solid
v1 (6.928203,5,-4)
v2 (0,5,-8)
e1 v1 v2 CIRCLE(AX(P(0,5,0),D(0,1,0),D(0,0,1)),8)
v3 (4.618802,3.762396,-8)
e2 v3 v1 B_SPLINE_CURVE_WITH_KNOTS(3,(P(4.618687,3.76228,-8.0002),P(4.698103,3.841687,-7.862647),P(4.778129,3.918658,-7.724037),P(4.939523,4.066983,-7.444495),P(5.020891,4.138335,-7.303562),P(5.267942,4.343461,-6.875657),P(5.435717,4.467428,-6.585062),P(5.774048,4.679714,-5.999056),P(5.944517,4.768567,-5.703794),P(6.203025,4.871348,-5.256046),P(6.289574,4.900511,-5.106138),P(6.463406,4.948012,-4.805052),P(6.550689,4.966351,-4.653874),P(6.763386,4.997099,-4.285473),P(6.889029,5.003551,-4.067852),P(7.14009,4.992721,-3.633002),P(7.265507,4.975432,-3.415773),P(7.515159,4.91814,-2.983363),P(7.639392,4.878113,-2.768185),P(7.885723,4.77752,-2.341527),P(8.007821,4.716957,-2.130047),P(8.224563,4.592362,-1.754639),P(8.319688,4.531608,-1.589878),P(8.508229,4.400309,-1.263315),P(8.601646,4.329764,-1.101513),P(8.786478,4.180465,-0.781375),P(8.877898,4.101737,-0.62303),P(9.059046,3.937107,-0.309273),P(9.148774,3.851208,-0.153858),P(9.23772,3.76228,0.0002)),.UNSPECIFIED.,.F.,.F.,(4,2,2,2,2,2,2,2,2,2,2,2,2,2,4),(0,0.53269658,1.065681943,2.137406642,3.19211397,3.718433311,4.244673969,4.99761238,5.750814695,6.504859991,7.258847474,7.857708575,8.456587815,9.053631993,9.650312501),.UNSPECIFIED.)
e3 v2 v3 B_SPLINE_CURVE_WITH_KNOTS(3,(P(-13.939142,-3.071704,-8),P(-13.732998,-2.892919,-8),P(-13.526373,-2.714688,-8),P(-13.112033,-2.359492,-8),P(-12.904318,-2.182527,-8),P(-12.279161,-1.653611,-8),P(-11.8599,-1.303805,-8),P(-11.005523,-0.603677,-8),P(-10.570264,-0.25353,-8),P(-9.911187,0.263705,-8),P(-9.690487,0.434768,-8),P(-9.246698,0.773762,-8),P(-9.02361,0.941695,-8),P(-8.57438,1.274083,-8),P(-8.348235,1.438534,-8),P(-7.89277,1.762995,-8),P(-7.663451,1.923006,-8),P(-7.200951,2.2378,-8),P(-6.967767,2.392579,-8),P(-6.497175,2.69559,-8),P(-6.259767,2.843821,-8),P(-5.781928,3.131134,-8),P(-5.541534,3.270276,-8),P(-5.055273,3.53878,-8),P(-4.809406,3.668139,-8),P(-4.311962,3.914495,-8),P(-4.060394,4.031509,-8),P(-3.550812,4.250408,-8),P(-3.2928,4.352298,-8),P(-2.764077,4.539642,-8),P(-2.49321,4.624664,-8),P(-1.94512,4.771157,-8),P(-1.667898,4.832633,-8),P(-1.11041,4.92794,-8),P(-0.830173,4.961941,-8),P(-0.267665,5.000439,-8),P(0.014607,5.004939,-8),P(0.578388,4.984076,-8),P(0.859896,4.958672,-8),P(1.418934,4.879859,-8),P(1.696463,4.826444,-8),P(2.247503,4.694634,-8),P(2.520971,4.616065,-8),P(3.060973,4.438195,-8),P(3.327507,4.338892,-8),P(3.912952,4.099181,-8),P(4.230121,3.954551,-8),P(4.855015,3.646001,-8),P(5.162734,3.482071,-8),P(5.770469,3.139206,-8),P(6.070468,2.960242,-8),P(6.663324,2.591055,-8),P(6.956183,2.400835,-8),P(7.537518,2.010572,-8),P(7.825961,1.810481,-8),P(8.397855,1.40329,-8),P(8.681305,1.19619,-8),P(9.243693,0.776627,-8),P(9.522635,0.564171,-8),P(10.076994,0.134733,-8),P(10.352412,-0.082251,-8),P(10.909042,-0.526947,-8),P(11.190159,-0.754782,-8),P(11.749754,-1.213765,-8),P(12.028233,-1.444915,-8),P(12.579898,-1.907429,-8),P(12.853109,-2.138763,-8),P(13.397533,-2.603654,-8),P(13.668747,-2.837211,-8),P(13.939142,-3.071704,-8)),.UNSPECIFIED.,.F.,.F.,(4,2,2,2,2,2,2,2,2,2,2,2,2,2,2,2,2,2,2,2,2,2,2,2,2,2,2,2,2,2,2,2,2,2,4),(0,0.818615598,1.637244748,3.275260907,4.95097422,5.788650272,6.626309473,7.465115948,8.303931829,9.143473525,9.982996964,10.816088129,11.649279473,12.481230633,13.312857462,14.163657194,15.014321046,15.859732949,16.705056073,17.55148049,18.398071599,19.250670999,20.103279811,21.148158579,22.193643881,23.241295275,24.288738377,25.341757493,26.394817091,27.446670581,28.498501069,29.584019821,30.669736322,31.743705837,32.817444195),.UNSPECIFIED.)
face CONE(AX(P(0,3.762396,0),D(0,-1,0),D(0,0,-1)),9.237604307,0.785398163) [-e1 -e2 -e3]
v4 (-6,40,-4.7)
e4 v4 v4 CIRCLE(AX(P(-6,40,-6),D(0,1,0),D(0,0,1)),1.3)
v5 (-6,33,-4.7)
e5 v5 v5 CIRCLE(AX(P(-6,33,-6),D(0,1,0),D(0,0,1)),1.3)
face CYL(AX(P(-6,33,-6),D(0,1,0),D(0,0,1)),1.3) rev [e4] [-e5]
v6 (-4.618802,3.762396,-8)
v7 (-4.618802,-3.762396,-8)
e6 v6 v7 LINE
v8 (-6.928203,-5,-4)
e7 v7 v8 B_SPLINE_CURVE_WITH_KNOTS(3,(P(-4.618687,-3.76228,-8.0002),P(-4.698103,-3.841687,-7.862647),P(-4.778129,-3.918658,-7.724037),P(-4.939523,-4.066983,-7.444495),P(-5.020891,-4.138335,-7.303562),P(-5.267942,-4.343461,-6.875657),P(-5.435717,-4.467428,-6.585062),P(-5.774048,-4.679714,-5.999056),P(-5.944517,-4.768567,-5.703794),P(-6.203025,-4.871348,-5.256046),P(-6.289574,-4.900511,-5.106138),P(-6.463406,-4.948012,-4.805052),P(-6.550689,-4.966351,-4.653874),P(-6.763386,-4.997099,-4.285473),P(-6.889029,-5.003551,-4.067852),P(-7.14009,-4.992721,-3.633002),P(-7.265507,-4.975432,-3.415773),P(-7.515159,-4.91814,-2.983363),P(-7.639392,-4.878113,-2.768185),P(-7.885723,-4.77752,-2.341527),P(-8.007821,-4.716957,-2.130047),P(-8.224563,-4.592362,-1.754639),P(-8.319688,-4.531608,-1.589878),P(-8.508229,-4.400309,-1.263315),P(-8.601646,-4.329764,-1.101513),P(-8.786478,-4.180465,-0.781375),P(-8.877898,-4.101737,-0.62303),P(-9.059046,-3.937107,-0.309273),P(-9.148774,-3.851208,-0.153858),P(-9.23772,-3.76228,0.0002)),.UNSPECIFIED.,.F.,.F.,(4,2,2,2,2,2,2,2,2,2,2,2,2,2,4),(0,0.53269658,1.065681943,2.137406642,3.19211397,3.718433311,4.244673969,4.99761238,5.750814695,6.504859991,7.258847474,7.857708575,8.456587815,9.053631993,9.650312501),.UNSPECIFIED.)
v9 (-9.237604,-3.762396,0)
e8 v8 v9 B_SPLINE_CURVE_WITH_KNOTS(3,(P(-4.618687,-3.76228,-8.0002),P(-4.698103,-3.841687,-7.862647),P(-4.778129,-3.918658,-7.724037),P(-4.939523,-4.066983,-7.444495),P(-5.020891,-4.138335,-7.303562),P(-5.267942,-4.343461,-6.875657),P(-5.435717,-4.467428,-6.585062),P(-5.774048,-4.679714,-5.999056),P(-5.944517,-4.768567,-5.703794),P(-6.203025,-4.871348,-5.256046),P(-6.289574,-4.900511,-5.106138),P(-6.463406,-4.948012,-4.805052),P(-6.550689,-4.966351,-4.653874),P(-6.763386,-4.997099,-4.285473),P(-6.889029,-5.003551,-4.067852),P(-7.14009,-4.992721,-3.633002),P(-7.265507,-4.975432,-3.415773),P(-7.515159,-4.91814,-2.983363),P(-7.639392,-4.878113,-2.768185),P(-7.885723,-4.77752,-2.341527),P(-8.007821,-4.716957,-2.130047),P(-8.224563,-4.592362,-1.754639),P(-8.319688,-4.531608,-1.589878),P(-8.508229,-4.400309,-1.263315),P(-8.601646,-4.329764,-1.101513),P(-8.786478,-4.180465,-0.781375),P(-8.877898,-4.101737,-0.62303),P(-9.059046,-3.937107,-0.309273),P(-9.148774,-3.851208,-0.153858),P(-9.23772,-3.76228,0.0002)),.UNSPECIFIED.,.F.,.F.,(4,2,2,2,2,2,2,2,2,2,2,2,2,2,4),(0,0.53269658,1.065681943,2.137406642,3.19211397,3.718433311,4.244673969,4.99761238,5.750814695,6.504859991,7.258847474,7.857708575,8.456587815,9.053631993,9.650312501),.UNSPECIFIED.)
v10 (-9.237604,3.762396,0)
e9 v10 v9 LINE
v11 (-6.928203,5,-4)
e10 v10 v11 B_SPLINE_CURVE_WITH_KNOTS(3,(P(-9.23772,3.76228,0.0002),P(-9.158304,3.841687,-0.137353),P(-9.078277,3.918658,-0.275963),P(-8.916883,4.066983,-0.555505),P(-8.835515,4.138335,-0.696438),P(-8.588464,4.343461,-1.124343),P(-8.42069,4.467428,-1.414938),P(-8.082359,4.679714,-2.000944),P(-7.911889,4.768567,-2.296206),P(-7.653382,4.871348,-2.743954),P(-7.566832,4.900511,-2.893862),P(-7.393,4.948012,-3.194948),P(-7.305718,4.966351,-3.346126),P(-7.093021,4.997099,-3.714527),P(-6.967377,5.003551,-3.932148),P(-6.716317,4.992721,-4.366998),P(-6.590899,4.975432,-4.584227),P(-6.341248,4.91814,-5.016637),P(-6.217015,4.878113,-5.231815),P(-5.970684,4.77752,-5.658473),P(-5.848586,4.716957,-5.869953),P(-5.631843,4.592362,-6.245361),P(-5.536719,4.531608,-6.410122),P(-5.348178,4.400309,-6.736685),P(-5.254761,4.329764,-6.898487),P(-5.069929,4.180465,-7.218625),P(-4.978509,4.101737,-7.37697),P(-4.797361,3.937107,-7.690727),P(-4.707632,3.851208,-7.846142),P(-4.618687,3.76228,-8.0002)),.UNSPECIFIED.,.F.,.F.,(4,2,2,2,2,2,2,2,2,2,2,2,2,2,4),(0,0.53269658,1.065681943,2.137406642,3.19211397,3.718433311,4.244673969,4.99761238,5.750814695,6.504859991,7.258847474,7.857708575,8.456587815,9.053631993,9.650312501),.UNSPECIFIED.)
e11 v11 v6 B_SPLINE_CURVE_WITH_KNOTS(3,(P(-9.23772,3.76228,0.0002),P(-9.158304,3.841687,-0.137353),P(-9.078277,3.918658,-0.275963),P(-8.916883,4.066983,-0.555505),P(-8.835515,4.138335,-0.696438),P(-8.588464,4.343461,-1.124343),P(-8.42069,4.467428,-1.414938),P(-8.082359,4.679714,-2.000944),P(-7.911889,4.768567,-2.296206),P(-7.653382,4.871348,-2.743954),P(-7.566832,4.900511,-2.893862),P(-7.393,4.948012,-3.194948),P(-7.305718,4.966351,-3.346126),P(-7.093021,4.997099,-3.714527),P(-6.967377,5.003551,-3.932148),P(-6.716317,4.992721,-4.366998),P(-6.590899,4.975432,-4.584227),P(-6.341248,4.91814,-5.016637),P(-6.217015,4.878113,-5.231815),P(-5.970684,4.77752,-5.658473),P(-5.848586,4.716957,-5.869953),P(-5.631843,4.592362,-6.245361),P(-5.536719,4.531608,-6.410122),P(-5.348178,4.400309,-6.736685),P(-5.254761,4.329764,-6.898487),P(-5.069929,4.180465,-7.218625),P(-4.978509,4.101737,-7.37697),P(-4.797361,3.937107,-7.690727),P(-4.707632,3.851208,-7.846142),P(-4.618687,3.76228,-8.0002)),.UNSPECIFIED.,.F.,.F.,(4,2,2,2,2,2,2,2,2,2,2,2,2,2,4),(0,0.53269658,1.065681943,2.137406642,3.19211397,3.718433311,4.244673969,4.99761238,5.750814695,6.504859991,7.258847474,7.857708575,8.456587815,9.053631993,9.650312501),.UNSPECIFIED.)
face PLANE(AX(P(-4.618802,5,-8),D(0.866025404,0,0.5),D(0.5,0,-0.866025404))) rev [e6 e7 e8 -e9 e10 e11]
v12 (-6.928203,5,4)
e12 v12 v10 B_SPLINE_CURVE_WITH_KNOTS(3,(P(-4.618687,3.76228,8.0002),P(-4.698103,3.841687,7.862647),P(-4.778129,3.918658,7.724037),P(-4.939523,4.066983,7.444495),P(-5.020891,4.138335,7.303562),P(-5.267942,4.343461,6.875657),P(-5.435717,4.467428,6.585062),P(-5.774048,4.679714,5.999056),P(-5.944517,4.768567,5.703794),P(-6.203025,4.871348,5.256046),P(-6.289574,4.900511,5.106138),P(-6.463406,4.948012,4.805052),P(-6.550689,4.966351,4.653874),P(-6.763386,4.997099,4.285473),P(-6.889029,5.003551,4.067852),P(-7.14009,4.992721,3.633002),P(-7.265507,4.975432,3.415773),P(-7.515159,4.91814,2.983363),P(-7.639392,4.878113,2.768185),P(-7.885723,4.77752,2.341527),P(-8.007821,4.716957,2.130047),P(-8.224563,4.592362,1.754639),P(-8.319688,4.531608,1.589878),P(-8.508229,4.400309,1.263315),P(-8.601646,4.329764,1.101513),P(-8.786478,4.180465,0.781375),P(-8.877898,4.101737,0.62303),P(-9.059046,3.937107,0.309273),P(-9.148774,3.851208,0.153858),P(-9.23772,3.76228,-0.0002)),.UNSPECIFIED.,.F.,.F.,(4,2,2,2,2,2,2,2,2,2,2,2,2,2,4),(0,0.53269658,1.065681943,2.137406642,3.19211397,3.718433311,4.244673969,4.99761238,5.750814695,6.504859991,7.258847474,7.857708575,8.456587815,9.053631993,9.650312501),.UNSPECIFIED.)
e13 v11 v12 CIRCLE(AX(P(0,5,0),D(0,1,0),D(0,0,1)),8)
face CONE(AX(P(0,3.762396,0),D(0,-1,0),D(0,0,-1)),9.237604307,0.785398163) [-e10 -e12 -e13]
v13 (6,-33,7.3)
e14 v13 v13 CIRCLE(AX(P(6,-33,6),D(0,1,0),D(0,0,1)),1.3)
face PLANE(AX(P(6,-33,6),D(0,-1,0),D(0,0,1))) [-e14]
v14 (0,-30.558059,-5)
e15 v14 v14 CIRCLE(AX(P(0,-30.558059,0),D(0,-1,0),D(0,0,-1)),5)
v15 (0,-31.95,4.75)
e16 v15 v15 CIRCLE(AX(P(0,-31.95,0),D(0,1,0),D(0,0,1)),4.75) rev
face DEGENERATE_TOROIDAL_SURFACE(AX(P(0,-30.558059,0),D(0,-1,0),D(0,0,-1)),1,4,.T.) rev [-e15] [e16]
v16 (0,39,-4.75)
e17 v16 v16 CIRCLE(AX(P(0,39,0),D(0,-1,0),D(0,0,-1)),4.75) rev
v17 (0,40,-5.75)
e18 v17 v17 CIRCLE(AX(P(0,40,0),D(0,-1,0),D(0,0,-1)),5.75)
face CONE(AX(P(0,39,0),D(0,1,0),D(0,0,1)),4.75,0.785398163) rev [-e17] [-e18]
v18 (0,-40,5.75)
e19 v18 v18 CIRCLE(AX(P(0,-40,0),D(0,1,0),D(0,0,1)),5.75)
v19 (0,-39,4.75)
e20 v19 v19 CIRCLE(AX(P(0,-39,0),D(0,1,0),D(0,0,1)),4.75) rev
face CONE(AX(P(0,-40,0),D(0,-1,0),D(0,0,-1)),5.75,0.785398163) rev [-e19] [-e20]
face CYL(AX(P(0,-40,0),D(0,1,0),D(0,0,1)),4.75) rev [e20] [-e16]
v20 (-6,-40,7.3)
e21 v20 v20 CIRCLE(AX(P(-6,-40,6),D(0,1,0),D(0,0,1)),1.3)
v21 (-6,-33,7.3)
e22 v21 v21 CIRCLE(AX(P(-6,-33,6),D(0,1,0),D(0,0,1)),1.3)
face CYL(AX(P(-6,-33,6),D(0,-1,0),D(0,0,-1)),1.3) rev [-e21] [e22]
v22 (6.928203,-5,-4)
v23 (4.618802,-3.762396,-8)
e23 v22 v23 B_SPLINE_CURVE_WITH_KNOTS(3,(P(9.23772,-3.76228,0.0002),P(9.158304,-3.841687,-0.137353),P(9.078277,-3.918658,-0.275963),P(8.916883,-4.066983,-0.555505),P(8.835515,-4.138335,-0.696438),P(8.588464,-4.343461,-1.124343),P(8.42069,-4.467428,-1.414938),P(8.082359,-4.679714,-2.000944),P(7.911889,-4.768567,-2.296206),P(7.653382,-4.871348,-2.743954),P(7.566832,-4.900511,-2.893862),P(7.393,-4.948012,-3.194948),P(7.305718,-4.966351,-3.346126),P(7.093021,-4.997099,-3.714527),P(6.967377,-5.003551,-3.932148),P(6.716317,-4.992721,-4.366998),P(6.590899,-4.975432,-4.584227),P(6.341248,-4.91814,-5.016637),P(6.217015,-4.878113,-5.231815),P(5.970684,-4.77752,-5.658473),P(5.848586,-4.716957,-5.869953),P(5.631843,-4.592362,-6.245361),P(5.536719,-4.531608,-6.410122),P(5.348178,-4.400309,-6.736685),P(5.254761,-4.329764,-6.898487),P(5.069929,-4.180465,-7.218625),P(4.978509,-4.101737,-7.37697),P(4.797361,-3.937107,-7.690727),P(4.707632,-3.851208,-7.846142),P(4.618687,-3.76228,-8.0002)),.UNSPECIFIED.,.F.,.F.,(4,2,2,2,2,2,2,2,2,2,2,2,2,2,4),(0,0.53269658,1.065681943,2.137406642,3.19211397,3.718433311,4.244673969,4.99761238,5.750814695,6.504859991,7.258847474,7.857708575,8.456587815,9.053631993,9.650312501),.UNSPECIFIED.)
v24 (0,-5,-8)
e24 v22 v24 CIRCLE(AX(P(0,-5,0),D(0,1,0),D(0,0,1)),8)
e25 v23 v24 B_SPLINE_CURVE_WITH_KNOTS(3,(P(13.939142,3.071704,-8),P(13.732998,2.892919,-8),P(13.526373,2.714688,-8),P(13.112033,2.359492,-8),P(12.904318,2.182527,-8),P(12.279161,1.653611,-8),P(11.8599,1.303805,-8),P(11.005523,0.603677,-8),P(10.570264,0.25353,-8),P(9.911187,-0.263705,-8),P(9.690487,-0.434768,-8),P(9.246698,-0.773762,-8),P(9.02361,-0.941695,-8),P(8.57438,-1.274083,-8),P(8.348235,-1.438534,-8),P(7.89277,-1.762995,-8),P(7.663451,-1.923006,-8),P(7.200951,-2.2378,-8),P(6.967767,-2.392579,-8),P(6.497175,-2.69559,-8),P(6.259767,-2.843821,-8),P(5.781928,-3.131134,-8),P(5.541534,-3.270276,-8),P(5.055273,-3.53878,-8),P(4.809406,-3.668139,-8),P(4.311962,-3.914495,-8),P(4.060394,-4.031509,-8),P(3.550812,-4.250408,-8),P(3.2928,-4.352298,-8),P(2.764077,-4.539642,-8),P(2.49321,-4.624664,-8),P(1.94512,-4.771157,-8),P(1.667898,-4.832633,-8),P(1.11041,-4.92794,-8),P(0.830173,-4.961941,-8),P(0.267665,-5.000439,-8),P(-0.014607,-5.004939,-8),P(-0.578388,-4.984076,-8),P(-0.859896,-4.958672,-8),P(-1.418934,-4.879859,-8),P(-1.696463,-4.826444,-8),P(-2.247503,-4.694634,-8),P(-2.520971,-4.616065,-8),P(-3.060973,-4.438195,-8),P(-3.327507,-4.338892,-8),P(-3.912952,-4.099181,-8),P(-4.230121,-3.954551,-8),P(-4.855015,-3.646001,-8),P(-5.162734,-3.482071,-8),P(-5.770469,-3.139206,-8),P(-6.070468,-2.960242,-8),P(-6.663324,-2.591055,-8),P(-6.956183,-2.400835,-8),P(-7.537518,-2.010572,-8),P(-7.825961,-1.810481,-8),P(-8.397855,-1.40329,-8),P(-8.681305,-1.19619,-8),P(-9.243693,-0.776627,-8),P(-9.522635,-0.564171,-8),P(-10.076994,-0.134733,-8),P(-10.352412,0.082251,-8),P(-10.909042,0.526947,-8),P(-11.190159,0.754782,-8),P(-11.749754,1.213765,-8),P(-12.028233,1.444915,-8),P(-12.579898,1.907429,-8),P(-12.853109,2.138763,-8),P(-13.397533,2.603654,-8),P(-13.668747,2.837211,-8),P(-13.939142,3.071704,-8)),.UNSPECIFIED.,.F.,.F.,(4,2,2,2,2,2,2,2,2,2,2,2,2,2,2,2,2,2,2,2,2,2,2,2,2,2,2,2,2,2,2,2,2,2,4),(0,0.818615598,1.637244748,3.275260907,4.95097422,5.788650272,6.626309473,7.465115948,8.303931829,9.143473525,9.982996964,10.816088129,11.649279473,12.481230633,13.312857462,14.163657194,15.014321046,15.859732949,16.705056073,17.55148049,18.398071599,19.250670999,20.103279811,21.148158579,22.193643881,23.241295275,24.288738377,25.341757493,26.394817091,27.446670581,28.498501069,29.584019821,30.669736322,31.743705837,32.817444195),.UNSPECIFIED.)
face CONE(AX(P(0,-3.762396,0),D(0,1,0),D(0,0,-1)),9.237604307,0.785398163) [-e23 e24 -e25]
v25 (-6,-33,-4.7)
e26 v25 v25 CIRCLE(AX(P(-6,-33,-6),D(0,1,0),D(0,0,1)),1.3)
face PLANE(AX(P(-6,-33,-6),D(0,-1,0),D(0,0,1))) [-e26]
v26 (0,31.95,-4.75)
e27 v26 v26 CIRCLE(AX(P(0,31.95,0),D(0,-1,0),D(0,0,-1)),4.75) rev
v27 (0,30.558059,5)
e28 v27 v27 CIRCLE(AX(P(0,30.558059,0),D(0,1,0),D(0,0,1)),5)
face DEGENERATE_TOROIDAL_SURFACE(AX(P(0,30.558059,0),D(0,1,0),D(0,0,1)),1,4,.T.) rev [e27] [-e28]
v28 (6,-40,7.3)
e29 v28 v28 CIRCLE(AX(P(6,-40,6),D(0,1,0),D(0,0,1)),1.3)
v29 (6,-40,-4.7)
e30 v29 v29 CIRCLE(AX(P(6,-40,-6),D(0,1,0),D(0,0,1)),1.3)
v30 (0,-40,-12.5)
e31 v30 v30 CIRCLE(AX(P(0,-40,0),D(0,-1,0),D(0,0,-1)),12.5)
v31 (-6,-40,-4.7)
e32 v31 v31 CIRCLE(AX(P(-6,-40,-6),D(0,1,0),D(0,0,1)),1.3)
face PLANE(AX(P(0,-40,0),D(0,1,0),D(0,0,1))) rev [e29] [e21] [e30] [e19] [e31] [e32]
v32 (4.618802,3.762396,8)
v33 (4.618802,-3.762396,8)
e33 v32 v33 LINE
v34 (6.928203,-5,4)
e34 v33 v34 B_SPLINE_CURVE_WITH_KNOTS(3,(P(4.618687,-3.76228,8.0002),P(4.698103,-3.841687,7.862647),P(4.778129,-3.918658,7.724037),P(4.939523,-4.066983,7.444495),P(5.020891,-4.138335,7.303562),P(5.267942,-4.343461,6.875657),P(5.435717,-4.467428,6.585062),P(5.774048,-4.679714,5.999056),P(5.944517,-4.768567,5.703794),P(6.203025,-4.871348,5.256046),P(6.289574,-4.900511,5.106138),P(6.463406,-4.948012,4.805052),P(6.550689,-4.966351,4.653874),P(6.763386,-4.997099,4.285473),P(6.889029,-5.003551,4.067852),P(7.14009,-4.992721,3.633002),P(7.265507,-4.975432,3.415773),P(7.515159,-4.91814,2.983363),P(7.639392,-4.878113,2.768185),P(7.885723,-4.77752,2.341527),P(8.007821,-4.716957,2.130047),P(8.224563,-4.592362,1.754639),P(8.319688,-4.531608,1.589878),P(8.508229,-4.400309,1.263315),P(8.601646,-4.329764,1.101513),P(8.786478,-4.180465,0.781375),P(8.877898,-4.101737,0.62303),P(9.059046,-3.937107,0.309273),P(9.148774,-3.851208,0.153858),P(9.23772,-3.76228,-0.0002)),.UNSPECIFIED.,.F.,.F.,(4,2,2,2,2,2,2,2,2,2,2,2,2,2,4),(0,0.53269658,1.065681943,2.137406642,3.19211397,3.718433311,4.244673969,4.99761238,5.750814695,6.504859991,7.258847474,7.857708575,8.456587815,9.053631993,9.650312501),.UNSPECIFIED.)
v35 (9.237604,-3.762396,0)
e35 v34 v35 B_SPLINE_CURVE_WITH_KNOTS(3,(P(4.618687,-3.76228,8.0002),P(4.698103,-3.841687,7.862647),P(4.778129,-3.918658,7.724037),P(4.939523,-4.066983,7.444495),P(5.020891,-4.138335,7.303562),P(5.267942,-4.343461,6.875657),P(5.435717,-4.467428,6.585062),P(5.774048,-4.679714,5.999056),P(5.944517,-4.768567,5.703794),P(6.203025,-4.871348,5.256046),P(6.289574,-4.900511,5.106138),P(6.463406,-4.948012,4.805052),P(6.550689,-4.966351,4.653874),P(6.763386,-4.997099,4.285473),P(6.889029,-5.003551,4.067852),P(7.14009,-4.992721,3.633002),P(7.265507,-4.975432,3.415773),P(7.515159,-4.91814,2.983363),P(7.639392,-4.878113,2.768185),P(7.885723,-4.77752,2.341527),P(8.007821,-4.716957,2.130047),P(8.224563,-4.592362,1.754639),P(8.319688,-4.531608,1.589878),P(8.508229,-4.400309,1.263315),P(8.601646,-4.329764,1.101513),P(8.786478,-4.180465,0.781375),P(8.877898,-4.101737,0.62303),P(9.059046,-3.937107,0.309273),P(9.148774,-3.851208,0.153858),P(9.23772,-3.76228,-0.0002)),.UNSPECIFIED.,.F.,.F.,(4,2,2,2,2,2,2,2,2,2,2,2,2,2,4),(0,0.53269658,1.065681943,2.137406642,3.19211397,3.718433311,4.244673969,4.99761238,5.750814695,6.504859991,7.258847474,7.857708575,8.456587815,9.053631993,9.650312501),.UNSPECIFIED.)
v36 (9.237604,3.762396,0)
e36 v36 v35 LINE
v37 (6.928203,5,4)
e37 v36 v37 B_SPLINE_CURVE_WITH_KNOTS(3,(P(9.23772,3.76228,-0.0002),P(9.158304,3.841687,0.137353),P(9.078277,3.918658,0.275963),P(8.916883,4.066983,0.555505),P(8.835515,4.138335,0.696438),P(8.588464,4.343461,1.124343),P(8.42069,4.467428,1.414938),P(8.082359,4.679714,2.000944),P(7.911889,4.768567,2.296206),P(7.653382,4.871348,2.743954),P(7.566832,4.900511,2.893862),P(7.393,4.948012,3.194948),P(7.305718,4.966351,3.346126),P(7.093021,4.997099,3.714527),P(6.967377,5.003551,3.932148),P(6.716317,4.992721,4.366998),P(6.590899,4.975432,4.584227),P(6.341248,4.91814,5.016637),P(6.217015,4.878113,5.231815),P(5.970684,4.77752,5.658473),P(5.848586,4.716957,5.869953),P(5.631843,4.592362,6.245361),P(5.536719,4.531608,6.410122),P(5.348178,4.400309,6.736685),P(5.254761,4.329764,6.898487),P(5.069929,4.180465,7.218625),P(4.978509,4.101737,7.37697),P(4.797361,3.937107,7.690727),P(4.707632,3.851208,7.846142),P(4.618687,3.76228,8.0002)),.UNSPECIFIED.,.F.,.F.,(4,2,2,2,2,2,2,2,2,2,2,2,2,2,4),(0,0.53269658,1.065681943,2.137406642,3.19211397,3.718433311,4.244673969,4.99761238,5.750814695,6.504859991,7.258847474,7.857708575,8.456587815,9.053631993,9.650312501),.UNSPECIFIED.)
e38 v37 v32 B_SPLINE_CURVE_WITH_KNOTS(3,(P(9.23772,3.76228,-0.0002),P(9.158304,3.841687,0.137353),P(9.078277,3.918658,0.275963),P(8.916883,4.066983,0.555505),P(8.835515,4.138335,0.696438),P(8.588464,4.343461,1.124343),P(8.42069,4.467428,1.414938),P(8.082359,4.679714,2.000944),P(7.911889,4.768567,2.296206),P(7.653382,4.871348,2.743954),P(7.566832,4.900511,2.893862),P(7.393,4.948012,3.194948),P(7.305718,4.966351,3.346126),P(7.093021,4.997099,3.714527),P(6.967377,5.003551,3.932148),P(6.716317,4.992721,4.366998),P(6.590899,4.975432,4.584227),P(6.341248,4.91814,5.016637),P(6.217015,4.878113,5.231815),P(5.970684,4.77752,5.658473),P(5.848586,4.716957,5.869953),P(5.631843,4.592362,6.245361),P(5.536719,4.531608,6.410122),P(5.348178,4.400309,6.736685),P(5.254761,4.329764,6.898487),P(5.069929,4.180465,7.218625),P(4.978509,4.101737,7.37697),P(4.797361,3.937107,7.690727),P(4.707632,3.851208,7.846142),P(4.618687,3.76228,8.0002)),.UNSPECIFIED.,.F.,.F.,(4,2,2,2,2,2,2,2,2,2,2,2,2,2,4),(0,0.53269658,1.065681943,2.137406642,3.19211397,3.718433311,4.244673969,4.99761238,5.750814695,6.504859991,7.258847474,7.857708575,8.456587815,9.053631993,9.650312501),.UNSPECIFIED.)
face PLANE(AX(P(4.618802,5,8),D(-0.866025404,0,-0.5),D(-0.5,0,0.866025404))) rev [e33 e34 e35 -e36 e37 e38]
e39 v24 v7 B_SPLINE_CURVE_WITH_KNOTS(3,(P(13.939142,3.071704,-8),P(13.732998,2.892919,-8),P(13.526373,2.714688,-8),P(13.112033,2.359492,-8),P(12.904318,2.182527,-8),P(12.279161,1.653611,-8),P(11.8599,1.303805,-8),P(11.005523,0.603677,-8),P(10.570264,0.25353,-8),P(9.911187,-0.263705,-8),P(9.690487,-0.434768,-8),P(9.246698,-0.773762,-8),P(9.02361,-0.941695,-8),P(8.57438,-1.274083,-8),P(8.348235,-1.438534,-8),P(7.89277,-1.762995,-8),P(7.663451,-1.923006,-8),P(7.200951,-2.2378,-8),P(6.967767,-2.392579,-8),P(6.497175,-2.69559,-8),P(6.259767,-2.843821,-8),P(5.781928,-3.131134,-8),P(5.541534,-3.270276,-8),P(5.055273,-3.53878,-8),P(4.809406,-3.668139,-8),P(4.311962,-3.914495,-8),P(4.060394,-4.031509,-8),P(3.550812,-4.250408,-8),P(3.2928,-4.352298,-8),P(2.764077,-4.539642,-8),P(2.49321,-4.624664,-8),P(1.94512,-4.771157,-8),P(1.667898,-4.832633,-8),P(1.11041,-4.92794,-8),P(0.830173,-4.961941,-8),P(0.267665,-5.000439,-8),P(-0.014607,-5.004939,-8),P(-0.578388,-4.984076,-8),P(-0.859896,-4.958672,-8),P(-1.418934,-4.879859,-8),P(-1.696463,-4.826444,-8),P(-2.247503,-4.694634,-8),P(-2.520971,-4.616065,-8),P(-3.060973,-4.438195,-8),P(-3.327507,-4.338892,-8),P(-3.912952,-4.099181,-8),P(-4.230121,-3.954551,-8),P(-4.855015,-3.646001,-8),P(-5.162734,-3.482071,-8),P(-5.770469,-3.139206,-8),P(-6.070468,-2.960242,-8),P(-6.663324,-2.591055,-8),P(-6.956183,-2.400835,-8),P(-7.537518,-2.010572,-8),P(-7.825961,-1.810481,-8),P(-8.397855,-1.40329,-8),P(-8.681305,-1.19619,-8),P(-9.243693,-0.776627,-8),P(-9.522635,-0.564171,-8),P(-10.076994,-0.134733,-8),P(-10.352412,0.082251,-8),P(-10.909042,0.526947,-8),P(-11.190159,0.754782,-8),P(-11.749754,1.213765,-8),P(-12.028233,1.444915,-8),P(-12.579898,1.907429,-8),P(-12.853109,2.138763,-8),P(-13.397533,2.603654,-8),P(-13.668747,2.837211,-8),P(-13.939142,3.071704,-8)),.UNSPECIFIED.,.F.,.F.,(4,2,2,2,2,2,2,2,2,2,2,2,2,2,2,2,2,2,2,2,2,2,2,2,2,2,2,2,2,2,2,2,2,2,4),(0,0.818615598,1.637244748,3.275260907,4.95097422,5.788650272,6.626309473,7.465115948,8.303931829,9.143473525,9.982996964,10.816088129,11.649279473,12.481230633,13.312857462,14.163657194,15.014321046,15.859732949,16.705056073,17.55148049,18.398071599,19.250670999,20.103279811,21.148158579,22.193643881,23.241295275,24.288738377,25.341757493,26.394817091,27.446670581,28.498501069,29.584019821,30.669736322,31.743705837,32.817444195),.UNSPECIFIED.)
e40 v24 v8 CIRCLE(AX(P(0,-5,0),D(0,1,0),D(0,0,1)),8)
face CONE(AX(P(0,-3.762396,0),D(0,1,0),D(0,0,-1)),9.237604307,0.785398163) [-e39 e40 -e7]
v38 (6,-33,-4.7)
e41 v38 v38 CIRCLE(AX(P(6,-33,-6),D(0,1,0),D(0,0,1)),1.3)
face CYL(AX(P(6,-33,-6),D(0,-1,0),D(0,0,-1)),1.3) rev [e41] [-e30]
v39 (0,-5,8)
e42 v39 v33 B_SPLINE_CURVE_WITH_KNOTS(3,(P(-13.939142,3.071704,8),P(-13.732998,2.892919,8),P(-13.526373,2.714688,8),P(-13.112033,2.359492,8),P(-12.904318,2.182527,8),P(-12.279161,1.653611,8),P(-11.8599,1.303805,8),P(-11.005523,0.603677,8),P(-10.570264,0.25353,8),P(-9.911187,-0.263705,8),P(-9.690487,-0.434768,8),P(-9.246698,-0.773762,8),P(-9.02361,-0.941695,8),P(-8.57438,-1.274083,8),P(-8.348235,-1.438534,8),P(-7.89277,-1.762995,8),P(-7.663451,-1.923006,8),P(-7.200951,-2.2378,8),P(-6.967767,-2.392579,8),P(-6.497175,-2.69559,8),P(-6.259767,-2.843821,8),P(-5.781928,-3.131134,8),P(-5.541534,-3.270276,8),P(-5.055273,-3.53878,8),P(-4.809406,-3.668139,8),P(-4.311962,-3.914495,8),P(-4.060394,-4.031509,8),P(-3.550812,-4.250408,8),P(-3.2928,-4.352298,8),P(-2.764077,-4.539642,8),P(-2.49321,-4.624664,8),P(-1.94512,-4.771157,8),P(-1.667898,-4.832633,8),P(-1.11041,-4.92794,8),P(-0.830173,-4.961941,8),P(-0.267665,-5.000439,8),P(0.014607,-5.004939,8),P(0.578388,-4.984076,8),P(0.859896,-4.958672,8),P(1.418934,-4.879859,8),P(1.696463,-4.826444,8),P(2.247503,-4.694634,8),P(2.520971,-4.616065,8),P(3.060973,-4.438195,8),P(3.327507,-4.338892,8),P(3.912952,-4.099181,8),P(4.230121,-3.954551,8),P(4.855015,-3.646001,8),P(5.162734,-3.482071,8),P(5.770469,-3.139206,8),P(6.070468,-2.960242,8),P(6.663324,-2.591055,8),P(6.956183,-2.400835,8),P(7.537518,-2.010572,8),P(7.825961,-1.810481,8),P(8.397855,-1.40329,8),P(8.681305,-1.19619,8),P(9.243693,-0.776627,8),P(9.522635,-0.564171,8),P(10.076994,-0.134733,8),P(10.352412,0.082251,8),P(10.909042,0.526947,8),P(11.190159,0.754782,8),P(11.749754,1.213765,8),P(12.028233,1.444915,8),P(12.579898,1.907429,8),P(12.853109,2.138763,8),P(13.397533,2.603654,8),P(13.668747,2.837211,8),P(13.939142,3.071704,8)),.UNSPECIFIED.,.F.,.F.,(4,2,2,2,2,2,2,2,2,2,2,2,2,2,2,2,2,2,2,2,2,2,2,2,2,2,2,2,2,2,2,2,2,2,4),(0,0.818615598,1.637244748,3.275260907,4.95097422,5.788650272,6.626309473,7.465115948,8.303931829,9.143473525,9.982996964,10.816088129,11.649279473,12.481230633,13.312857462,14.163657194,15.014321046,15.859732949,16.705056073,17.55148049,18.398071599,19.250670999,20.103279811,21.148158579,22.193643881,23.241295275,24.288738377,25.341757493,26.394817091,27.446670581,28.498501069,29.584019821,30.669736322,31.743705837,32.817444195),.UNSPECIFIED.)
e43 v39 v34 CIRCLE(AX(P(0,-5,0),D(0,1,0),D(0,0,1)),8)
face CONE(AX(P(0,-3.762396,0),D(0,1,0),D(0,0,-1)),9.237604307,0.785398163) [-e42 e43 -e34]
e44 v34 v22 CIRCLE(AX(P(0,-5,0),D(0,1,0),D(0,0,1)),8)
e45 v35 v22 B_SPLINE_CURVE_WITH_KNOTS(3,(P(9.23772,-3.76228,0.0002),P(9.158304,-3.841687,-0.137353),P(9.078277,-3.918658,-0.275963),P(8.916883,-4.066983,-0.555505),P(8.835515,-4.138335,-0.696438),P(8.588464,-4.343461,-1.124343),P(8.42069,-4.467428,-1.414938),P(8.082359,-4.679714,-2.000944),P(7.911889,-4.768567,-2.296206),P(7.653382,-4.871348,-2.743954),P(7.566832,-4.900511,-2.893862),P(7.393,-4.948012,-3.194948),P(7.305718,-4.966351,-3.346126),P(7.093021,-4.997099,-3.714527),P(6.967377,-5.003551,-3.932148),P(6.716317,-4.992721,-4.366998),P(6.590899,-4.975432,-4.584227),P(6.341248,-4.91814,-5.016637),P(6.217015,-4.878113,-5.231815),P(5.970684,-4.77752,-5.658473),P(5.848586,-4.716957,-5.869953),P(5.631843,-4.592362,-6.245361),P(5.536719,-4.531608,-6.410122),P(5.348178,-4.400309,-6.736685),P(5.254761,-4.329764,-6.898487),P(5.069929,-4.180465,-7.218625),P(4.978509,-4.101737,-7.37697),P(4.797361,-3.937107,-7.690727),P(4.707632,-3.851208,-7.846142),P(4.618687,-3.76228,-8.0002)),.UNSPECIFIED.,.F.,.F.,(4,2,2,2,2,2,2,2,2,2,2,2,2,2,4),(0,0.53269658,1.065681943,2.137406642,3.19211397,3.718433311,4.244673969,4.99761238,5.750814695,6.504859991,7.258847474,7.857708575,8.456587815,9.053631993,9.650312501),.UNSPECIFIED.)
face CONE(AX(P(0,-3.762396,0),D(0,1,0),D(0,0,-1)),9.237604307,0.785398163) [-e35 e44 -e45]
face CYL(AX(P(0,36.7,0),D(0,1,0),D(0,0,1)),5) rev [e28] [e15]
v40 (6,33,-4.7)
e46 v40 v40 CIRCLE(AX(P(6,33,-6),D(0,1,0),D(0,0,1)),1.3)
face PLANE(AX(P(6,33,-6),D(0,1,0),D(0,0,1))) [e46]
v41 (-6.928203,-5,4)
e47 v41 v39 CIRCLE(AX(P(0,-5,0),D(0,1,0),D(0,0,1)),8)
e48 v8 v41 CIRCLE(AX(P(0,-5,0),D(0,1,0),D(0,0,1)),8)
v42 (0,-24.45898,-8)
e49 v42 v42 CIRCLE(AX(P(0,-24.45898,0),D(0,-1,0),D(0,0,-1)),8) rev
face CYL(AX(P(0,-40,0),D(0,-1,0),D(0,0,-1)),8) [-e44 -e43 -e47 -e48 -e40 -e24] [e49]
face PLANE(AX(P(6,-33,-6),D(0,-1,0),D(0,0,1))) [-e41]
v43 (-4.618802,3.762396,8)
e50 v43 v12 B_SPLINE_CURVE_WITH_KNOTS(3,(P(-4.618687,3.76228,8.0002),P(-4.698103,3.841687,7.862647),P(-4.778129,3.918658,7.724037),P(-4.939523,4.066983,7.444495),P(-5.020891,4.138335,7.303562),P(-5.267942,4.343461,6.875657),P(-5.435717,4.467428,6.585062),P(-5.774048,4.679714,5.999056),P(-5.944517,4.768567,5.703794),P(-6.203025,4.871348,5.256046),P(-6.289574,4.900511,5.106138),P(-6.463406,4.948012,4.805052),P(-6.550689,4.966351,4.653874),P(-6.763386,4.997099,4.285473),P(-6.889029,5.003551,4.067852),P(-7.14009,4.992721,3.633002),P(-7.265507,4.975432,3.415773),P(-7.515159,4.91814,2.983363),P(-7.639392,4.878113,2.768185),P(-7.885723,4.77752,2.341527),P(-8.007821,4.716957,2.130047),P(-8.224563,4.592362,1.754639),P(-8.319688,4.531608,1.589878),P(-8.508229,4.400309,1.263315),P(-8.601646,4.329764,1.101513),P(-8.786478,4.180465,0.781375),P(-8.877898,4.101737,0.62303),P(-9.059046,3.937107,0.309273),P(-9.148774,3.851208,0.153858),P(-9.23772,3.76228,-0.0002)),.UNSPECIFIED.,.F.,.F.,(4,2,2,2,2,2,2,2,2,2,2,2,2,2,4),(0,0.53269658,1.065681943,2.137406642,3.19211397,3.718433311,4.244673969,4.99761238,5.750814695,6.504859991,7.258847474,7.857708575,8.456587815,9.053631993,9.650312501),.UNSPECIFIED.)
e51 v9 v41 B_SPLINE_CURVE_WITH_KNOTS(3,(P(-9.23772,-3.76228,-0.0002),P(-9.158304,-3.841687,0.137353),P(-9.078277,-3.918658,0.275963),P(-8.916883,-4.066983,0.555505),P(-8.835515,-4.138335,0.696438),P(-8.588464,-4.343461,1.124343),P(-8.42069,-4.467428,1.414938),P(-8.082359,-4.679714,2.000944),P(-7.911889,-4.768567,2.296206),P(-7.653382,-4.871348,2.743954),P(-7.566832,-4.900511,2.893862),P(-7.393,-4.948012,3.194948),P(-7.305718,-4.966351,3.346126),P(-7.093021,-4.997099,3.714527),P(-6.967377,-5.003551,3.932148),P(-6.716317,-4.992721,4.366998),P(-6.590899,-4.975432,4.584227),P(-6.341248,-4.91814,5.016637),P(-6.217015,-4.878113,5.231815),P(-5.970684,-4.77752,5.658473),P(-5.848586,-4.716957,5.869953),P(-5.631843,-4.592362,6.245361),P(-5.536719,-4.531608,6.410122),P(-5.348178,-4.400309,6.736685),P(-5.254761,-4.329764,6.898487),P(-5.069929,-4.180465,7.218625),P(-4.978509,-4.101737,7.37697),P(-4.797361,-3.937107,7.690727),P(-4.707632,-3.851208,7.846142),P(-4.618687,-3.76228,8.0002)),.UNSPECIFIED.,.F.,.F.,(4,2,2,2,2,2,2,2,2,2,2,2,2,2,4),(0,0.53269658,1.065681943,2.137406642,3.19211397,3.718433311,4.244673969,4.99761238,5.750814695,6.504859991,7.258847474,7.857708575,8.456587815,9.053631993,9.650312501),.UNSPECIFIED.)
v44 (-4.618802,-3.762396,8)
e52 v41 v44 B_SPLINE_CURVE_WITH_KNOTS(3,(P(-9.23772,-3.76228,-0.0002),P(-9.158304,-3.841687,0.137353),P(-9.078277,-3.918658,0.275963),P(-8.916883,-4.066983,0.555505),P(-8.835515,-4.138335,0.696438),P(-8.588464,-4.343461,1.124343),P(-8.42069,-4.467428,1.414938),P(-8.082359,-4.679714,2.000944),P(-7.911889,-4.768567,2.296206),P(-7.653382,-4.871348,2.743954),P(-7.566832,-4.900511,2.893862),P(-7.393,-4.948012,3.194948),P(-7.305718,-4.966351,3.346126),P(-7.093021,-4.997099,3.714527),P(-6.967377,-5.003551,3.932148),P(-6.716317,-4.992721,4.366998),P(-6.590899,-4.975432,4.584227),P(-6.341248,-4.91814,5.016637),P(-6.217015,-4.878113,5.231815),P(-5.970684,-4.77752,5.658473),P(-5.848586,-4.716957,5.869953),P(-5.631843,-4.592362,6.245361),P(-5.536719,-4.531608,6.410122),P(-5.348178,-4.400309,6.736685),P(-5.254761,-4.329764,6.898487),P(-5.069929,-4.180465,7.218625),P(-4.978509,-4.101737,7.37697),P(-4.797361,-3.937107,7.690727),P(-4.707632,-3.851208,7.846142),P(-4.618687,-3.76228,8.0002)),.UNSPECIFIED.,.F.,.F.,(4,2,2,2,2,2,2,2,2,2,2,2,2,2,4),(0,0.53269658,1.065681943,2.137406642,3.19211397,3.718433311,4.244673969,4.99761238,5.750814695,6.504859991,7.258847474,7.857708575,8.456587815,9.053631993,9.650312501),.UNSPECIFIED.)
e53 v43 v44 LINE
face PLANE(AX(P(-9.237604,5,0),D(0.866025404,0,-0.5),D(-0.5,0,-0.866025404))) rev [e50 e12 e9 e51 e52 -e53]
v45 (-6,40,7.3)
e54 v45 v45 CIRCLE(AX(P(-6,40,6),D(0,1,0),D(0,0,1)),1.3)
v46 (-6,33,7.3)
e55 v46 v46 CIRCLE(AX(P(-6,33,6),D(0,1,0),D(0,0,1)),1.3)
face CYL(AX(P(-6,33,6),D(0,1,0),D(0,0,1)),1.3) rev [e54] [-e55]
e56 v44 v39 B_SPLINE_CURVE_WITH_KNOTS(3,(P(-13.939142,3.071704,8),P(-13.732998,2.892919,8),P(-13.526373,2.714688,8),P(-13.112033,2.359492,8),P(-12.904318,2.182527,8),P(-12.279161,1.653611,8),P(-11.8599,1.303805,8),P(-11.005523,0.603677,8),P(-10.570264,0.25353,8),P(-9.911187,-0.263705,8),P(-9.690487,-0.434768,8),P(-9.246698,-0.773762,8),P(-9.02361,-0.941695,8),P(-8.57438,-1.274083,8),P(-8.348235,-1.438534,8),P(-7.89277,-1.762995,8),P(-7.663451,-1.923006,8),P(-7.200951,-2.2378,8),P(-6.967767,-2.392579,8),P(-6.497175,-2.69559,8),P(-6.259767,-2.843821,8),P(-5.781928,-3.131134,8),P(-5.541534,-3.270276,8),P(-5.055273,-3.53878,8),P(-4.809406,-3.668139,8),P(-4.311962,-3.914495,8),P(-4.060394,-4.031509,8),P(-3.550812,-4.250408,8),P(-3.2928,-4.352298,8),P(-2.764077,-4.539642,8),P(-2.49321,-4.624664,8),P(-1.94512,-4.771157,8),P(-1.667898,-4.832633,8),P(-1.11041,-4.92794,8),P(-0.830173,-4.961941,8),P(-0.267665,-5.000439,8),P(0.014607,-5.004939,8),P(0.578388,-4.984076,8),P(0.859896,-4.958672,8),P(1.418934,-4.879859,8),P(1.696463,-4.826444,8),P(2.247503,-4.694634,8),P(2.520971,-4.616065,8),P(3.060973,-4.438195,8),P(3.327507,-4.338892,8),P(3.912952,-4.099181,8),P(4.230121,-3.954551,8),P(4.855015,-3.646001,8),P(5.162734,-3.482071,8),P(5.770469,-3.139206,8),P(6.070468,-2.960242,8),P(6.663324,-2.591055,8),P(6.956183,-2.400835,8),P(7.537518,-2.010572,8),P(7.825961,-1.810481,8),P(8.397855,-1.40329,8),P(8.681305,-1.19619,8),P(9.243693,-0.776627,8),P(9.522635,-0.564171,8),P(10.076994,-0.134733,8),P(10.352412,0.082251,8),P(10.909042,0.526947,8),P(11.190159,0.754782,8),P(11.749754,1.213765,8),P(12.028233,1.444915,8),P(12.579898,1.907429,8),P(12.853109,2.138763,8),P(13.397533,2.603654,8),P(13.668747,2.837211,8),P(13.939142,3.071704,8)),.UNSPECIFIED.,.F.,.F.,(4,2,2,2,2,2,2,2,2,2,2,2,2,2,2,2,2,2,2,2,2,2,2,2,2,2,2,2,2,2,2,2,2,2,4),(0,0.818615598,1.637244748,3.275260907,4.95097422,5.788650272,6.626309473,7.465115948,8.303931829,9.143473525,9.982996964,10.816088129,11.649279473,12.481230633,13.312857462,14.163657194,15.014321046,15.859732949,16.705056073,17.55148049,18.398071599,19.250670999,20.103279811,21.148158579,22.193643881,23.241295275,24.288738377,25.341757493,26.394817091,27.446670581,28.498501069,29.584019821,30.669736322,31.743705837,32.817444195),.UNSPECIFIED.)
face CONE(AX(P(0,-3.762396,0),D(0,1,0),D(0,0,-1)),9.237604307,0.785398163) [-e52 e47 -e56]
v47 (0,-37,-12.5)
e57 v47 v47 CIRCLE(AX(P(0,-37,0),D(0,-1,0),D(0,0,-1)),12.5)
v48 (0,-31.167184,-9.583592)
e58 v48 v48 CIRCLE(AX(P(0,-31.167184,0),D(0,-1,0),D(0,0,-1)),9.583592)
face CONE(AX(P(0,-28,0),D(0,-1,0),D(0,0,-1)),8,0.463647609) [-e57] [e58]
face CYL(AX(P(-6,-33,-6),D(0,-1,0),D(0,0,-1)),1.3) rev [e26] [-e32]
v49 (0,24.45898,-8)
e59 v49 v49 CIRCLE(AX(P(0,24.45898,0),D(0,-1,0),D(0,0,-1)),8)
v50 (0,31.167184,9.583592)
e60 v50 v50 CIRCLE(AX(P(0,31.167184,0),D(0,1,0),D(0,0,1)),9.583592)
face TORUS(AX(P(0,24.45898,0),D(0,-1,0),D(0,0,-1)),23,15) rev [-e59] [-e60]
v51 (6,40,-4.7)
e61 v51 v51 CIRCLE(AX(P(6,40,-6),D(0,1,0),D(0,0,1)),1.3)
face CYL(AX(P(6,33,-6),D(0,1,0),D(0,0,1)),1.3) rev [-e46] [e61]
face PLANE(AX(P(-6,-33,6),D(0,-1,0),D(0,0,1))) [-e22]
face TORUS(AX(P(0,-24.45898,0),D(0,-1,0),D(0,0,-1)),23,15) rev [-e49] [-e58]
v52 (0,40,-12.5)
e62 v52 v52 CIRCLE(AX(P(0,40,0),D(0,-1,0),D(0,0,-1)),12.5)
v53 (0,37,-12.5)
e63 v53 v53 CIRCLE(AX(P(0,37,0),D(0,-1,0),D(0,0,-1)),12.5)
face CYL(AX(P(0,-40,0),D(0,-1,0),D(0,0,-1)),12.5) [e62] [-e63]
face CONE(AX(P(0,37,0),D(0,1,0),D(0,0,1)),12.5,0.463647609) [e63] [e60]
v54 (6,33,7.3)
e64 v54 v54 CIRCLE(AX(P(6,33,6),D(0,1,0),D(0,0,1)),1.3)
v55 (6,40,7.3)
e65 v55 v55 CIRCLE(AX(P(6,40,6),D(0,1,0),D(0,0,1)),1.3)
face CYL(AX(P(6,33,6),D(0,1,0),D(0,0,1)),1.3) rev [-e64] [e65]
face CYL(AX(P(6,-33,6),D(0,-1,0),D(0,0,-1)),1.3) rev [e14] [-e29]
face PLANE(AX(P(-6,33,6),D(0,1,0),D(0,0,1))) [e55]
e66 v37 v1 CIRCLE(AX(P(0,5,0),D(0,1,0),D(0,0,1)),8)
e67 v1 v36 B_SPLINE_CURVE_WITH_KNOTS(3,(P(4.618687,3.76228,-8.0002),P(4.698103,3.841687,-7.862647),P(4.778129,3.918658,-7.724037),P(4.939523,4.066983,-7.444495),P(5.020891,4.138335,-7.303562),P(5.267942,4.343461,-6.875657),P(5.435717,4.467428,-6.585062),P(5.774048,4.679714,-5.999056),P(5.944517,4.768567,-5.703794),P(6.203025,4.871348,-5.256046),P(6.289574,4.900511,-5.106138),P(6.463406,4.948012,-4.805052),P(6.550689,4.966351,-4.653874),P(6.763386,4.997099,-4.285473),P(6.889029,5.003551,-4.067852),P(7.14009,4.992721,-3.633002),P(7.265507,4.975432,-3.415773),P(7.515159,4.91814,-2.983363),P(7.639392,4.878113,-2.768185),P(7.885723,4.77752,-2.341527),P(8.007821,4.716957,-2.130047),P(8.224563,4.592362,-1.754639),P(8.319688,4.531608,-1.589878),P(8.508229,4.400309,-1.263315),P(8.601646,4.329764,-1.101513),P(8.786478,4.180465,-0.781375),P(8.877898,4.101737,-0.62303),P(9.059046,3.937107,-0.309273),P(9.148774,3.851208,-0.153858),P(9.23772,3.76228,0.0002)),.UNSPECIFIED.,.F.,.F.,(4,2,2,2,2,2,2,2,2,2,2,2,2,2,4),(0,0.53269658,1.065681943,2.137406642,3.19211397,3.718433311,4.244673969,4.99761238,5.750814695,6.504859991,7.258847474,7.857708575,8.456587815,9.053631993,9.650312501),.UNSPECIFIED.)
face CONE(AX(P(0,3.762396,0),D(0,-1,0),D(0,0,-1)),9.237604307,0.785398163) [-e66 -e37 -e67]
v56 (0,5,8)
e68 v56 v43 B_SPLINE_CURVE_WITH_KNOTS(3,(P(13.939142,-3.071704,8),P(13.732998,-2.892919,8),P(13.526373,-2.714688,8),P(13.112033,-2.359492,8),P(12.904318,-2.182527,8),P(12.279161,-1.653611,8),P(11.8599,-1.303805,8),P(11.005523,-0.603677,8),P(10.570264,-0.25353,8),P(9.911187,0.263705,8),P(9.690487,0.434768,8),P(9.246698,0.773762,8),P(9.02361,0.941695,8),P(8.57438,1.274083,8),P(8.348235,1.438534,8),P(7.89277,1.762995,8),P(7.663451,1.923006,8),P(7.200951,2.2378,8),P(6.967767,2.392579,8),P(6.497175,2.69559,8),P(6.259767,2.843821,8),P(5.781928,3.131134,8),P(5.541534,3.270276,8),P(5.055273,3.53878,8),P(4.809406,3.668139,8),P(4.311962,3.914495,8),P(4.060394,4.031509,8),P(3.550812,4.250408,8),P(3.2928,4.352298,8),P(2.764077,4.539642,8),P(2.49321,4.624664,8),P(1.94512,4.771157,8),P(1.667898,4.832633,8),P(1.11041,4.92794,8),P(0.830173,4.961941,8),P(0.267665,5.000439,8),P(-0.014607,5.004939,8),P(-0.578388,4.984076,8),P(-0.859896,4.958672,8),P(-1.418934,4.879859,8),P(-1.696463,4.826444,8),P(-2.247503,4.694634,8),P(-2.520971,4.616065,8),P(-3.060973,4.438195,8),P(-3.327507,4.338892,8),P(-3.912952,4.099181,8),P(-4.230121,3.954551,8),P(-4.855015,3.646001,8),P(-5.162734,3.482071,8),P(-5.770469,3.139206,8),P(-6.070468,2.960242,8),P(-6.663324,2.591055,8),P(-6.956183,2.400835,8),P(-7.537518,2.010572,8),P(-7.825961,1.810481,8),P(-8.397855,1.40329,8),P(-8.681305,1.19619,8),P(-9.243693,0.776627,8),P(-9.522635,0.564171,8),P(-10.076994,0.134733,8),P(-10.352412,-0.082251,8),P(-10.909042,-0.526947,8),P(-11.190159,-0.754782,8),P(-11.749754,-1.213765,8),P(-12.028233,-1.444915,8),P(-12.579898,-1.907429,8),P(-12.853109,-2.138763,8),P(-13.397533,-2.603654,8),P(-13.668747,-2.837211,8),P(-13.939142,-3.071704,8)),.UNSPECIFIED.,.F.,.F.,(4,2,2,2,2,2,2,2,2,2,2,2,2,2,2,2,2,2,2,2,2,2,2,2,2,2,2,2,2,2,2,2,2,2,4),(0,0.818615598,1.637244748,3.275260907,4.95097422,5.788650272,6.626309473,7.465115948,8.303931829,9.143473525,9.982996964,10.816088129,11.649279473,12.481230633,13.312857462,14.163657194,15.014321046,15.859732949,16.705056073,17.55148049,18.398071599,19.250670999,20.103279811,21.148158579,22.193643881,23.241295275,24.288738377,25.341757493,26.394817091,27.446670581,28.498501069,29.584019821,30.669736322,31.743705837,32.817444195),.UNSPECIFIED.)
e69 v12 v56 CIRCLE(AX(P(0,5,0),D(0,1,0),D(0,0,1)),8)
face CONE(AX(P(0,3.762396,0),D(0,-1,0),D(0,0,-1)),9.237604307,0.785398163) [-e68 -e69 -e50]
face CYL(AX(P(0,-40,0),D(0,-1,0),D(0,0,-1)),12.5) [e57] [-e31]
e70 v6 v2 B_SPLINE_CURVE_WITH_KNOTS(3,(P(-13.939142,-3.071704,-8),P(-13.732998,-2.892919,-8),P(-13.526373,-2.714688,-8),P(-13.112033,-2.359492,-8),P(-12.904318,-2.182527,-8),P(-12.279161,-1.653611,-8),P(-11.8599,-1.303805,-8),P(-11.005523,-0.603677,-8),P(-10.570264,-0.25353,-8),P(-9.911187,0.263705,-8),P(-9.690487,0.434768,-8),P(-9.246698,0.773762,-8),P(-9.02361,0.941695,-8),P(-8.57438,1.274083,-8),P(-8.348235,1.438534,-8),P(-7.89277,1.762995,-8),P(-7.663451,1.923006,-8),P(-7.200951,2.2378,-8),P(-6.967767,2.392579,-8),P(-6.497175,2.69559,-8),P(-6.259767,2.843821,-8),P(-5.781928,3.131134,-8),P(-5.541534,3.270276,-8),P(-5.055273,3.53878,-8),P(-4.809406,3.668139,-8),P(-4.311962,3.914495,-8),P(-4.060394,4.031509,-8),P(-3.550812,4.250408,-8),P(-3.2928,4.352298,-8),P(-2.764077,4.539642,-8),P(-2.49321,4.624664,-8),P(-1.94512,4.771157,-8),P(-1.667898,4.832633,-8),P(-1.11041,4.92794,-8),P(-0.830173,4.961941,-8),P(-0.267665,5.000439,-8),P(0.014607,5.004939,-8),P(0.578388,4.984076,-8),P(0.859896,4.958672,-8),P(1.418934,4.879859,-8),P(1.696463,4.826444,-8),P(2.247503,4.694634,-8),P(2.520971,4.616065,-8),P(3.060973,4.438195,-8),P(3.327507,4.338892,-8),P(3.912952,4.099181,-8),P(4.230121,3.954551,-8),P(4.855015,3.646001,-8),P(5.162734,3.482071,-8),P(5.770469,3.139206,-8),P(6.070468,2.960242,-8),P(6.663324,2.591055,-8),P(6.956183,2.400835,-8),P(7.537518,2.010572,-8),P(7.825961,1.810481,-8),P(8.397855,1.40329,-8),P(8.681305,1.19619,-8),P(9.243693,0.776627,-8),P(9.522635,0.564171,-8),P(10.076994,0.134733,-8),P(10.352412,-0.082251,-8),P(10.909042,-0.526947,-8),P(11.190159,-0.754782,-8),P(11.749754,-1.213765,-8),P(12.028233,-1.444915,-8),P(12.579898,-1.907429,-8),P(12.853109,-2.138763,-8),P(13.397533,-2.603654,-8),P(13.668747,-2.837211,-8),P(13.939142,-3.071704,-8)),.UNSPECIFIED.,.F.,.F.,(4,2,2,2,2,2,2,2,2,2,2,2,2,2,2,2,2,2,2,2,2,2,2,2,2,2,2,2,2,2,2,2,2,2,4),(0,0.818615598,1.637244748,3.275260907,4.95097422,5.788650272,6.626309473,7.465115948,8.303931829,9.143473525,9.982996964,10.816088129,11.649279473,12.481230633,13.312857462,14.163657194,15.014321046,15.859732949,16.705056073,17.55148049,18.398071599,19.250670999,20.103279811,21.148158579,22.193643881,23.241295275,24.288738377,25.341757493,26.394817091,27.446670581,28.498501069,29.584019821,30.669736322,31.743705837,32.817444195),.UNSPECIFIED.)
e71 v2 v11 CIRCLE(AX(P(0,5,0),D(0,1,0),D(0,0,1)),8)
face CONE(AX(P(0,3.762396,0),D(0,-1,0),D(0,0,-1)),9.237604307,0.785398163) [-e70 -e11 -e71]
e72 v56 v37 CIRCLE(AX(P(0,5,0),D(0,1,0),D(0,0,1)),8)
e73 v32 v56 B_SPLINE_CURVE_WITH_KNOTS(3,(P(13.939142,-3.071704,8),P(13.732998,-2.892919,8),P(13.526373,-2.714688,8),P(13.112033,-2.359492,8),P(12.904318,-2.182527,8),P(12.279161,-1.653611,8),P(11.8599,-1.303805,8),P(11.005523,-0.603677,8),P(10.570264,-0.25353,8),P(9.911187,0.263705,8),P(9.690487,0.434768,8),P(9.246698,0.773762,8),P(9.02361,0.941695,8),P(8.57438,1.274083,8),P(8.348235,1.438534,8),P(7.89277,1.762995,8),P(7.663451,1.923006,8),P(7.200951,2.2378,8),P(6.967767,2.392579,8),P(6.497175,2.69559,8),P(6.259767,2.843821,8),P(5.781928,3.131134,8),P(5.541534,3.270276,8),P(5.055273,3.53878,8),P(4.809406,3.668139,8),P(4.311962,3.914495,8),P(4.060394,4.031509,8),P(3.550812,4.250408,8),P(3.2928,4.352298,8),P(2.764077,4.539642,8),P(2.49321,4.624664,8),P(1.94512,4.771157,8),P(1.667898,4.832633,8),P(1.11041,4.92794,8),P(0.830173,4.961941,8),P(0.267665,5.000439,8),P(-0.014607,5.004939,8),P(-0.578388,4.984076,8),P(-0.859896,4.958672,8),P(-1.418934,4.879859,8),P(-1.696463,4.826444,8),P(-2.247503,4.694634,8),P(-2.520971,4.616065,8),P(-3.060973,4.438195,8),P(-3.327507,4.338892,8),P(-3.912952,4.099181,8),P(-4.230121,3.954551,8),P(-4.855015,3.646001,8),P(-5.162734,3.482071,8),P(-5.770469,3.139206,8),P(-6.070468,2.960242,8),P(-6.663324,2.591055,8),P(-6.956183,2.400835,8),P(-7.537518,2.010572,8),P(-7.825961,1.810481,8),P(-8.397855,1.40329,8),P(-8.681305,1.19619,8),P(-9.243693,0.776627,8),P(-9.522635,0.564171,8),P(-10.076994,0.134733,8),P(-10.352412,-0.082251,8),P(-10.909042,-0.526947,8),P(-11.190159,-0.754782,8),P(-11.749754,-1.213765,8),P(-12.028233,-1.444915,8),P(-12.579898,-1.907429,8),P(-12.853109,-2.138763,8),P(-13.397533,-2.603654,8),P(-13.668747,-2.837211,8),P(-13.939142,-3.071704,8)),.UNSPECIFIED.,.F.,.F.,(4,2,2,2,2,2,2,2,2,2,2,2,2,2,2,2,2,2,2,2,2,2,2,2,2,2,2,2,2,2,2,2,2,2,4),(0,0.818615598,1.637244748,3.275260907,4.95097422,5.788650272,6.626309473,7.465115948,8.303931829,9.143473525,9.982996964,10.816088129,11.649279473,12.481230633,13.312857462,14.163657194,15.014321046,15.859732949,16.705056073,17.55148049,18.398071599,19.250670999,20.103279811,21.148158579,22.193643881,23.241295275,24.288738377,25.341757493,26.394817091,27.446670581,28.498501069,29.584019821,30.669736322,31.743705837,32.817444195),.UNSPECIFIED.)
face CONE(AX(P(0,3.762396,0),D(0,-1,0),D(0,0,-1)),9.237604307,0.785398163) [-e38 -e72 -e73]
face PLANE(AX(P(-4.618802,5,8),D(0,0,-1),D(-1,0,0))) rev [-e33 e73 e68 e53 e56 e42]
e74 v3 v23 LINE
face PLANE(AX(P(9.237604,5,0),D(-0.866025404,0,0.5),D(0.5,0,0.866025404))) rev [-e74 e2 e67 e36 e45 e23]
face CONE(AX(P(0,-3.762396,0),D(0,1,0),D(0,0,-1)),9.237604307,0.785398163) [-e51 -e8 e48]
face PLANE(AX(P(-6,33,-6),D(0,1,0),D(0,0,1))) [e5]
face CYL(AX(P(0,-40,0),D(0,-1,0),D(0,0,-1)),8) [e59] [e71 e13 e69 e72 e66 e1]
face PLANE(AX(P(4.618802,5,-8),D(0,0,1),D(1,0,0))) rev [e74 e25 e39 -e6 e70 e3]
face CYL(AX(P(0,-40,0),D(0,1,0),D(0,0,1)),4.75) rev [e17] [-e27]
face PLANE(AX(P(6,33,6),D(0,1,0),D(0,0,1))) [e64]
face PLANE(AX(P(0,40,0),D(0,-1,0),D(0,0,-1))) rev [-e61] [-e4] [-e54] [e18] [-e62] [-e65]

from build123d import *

# Parameters (mm, degrees)
SKETCH2_R           = 1.3
CUT_EXTRUDE1_DEPTH  = 7
SKETCH4_R           = 4.75
CUT_EXTRUDE2_DEPTH  = 82.929848041
FILLET1_R           = 15
FILLET2_R           = 4
SKETCH5_R           = 7
BOSS_EXTRUDE1_DEPTH = 5
CHAMFER1_SIZE       = 1


with BuildPart() as part:
    # Sketch1 → Revolve1 (revolve)
    with BuildSketch(Plane.XY, mode=Mode.PRIVATE) as revolve1_sk:
        Polygon((0, -40), (0, 40), (-12.5, 40), (-12.5, 37), (-8, 28), (-8, -28), (-12.5, -37), (-12.5, -40), align=None)
    revolve(revolve1_sk.sketch.rotate(Axis((0, -40, 0), (0, 1, 0)), 270), axis=Axis((0, -40, 0), (0, 1, 0)))

    # Sketch2 → Cut-Extrude1 (cut)
    with BuildSketch(Plane(origin=(0, 40, 0), x_dir=(1, 0, 0), z_dir=(0, 1, 0))):
        with Locations(Location((-6, 6, 0), (0, 0, 270))):
            Circle(SKETCH2_R)
        with Locations(Location((6, 6, 0), (0, 0, 270))):
            Circle(SKETCH2_R)
        with Locations(Location((-6, -6, 0), (0, 0, 270))):
            Circle(SKETCH2_R)
        with Locations(Location((6, -6, 0), (0, 0, 270))):
            Circle(SKETCH2_R)
    cut_extrude1 = extrude(amount=-CUT_EXTRUDE1_DEPTH, mode=Mode.SUBTRACT)

    # Mirror1: Cut-Extrude1 across plane
    add(cut_extrude1.mirror(Plane.ZX), mode=Mode.SUBTRACT)

    # Sketch3 → Cut-Revolve1 (revolve, cut)
    with BuildSketch(Plane(origin=(0, 0, 0), x_dir=(0, 0, -1), z_dir=(1, 0, 0))):
        Polygon((-5, 31.7), (0, 36.7), (0, -36.7), (-5, -31.7), align=None)
    revolve(axis=Axis((0, 36.7, 0), (0, -1, 0)), mode=Mode.SUBTRACT)

    # Sketch4 → Cut-Extrude2 (cut, through all)
    with BuildSketch(Plane(origin=(0, 40, 0), x_dir=(1, 0, 0), z_dir=(0, 1, 0))):
        with Locations(Location((0, 0, 0), (0, 0, 270))):
            Circle(SKETCH4_R)
    extrude(amount=-CUT_EXTRUDE2_DEPTH, mode=Mode.SUBTRACT)

    # Fillet1
    fillet1_edges = [part.edges().sort_by_distance(p)[0] for p in [
        (0, -28, 8),
        (0, 28, 8),
    ]]
    fillet(fillet1_edges, radius=FILLET1_R)

    # Fillet2
    # the kernel refuses this fillet: 4 mm, written as the material it adds along each edge
    with BuildSketch(Plane(origin=(0, 31.7, 0), x_dir=(0, 0, 1), z_dir=(1, 0, 0))) as fillet2_piece_1:
        with BuildLine():
            CenterArc((1, 1.141941091), FILLET2_R, 339.635865194, 20.364134806)
            Line((5, 1.141941091), (5.08, 1.141941091))
            Line((5.08, 1.141941091), (5.08, 0))
            Line((5.08, 0), (5.056568542, -0.056568542))
            ThreePointArc((5.056568542, -0.056568542), (4.931568542, -0.181568542), (4.825, -0.277838822))
            Line((4.825, -0.277838822), (4.75, -0.25))
        make_face()
    revolve(axis=Axis((0, 31.7, 0), (0, -1, 0)))
    with BuildSketch(Plane(origin=(0, -31.7, 0), x_dir=(0, 0, 1), z_dir=(1, 0, 0))) as fillet2_piece_2:
        with BuildLine():
            CenterArc((1, -1.141941091), FILLET2_R, 0, 20.364134806)
            Line((4.75, 0.25), (4.825, 0.277838822))
            ThreePointArc((4.825, 0.277838822), (4.931568542, 0.181568542), (5.056568542, 0.056568542))
            Line((5.056568542, 0.056568542), (5.08, 0))
            Line((5.08, 0), (5.08, -1.141941091))
            Line((5.08, -1.141941091), (5, -1.141941091))
        make_face()
    revolve(axis=Axis((0, -31.7, 0), (0, -1, 0)))

    # Sketch5 → Boss-Extrude1 (add, symmetric)
    with BuildSketch(Plane(origin=(0, 0, 0), x_dir=(1, 0, 0), z_dir=(0, 1, 0))):
        Polygon((4.618802154, 8), (-4.618802154, 8), (-9.237604307, 0), (-4.618802154, -8), (4.618802154, -8), (9.237604307, 0), align=None)
        Circle(SKETCH5_R, mode=Mode.SUBTRACT)
    extrude(amount=BOSS_EXTRUDE1_DEPTH, both=True)

    # Sketch6 → Cut-Revolve2 (revolve, cut)
    with BuildSketch(Plane.XY, mode=Mode.PRIVATE) as cut_revolve2_sk:
        Polygon((-8, 5), (-9.237604307, 3.762395693), (-9.237604307, 5), align=None)
    cut_revolve2 = revolve(cut_revolve2_sk.sketch.rotate(Axis((0, -40, 0), (0, -1, 0)), 270), axis=Axis((0, -40, 0), (0, -1, 0)), mode=Mode.SUBTRACT)

    # Mirror2: Cut-Revolve2 across plane
    add(cut_revolve2.mirror(Plane.ZX), mode=Mode.SUBTRACT)

    # Chamfer1
    chamfer1_edges = [part.edges().sort_by_distance(p)[0] for p in [
        (0, -40, -4.75),
        (0, 40, -4.75),
    ]]
    chamfer(chamfer1_edges, length=CHAMFER1_SIZE)


solid = part.part
